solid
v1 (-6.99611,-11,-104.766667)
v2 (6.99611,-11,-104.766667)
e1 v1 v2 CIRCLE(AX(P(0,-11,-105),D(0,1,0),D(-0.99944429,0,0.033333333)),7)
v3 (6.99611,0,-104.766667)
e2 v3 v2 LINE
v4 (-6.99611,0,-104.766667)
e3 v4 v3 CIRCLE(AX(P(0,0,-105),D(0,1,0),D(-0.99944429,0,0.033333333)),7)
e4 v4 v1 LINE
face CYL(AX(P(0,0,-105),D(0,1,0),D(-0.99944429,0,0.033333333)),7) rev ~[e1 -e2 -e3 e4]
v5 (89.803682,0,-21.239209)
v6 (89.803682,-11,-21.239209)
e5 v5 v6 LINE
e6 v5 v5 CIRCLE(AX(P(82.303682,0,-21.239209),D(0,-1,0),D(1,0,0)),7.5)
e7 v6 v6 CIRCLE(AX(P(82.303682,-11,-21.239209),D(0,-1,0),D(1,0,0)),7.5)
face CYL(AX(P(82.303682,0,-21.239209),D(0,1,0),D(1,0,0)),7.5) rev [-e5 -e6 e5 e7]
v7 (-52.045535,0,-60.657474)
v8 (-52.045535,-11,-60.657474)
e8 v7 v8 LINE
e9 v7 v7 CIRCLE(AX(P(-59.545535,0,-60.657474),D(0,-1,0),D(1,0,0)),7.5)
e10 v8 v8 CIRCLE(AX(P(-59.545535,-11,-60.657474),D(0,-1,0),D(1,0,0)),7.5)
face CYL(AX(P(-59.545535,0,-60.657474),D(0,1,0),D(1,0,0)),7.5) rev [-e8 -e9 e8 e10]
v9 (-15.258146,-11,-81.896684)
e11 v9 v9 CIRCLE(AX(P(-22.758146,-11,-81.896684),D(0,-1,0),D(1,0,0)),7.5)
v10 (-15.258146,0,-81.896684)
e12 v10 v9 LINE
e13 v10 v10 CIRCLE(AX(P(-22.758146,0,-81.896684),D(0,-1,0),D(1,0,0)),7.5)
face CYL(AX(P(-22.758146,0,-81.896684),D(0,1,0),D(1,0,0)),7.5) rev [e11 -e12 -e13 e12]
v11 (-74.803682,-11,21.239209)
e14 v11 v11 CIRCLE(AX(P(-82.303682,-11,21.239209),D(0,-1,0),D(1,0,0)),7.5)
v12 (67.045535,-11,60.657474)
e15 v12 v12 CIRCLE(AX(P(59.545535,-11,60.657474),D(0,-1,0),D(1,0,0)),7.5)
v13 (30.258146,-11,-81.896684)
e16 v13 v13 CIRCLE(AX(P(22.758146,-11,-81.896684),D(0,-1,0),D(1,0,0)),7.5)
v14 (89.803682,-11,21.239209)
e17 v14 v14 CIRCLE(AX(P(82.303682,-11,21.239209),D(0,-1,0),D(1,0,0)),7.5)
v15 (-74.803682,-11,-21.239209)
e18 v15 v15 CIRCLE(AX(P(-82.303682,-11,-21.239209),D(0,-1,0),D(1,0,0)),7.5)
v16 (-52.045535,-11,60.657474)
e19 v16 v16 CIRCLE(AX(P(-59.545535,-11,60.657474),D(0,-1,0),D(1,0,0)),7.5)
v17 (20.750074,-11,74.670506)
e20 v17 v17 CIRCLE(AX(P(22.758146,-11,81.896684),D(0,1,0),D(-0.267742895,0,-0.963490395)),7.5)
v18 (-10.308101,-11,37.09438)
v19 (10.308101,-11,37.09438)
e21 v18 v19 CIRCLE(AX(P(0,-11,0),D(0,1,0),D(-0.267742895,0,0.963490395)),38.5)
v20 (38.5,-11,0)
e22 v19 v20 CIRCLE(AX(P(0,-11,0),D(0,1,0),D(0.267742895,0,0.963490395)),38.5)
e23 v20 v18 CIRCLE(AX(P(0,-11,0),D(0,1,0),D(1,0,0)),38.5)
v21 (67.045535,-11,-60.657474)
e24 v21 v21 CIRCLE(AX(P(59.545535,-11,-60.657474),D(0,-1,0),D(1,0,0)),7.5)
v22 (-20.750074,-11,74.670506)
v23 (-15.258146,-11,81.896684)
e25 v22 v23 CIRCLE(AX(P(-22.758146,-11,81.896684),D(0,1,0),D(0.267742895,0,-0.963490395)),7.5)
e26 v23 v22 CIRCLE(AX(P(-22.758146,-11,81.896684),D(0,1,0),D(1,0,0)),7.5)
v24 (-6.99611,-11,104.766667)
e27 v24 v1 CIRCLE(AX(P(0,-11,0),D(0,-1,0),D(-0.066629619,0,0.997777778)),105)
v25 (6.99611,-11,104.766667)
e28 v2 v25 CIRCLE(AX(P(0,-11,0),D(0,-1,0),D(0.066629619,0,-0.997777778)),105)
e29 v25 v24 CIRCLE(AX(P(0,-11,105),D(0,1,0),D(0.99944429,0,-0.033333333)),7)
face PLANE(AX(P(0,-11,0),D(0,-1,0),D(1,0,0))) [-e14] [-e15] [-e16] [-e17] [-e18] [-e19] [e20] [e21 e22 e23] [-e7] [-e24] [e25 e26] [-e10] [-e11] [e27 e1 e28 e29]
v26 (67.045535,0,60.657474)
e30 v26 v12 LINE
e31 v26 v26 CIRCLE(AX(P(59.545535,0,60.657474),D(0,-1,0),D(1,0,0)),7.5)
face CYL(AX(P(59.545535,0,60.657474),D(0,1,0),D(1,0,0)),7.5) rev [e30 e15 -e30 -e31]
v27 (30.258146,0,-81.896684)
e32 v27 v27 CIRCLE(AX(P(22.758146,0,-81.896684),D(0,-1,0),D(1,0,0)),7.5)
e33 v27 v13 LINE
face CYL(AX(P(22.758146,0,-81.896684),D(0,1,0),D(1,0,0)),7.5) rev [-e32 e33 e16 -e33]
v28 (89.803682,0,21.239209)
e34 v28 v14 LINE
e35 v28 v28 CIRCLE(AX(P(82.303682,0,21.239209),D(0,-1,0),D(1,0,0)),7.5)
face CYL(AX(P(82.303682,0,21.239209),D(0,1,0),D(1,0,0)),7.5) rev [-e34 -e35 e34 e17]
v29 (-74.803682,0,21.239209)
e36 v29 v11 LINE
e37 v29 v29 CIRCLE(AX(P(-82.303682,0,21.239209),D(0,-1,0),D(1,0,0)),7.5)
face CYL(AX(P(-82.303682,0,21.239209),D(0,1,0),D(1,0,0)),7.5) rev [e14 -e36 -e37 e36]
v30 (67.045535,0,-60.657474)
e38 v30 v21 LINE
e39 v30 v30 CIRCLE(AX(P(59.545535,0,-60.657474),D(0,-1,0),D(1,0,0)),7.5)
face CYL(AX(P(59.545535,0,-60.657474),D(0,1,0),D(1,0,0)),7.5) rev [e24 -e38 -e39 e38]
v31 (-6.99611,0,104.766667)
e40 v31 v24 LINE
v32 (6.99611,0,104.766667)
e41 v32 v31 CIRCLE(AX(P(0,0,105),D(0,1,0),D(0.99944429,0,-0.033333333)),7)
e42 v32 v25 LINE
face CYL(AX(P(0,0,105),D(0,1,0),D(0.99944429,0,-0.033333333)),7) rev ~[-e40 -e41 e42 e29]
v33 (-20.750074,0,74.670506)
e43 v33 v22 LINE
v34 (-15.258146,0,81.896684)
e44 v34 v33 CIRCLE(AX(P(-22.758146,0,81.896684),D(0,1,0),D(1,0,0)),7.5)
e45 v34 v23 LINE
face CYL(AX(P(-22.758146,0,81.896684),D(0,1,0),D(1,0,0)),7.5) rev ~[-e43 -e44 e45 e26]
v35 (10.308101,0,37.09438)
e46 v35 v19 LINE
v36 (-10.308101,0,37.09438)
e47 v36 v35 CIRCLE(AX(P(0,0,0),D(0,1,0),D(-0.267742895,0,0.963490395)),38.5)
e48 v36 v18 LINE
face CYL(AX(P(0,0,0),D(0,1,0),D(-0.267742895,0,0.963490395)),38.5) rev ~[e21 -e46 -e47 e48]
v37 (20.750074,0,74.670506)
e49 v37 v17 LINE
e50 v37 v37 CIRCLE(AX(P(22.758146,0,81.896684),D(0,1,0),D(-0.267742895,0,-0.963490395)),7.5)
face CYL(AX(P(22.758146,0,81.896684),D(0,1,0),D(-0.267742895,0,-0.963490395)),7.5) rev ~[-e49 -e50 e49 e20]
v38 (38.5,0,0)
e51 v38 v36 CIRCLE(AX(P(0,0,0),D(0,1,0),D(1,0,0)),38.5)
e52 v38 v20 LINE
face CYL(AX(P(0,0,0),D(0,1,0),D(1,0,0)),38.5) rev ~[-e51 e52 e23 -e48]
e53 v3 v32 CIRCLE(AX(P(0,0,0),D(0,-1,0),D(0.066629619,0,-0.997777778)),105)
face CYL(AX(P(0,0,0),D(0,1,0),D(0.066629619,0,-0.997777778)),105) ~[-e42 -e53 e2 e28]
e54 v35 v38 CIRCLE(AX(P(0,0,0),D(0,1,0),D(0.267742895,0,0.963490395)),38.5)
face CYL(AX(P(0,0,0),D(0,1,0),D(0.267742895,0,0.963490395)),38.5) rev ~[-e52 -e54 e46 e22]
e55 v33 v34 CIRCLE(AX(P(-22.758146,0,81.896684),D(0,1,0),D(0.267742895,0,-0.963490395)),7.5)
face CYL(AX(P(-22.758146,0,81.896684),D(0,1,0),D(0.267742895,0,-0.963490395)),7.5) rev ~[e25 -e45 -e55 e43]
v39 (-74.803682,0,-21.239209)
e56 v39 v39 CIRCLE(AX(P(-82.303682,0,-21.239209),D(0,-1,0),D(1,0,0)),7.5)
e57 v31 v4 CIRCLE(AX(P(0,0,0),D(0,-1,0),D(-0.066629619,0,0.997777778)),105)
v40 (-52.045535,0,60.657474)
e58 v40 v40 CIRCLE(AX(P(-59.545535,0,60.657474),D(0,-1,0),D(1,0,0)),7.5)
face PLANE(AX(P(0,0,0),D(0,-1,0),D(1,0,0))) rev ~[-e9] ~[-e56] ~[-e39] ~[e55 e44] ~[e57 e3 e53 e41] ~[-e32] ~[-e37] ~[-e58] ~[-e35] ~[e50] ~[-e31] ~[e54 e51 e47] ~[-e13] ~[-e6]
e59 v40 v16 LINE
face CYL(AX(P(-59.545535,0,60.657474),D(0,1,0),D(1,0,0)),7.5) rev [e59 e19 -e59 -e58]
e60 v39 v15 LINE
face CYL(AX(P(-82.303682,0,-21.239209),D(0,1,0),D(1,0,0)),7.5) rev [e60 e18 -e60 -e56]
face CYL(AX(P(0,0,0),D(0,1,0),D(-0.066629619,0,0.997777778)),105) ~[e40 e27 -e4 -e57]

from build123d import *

# Parameters (mm, degrees)
F0_R     = 7.5
F1_DEPTH = 11


# Not quite as in the source:
# - a feature of the source that left no trace in its solid (it failed there, or was rolled back) is left out


with BuildPart() as f1:
    # F0 (on Front) → F1 (new body)
    with BuildSketch(Plane.XZ):
        with BuildLine():
            ThreePointArc((6.9961100303, 104.7666666667), (0, 98), (-6.9961100303, 104.7666666667))
            ThreePointArc((-6.9961100303, 104.7666666667), (-105, 0), (-6.9961100303, -104.7666666667))
            ThreePointArc((-6.9961100303, -104.7666666667), (0, -98), (6.9961100303, -104.7666666667))
            ThreePointArc((6.9961100303, -104.7666666667), (105, 0), (6.9961100303, 104.7666666667))
        make_face()
        with Locations((-59.54553545, -60.6574744609)):
            Circle(F0_R, mode=Mode.SUBTRACT)
        with Locations((-22.7581460876, -81.8966836121)):
            Circle(F0_R, mode=Mode.SUBTRACT)
        with Locations((-82.3036815375, -21.2392091511)):
            Circle(F0_R, mode=Mode.SUBTRACT)
        with Locations((22.7581460876, -81.8966836121)):
            Circle(F0_R, mode=Mode.SUBTRACT)
        with Locations((59.54553545, -60.6574744609)):
            Circle(F0_R, mode=Mode.SUBTRACT)
        with Locations((82.3036815375, -21.2392091511)):
            Circle(F0_R, mode=Mode.SUBTRACT)
        with Locations((-82.3036815375, 21.2392091511)):
            Circle(F0_R, mode=Mode.SUBTRACT)
        with Locations((-59.54553545, 60.6574744609)):
            Circle(F0_R, mode=Mode.SUBTRACT)
        with BuildLine():
            ThreePointArc((-15.2581460876, 81.8966836121), (-16.7869427812, 77.3585418036), (-20.750074374, 74.6705056463))
            ThreePointArc((-20.750074374, 74.6705056463), (-28.729349394, 86.4348254206), (-15.2581460876, 81.8966836121))
        make_face(mode=Mode.SUBTRACT)
        with BuildLine():
            ThreePointArc((10.3081014632, 37.0943802243), (30.6521769727, 23.2957946169), (38.5, 0))
            ThreePointArc((38.5, 0), (-23.2957946169, -30.6521769727), (-10.3081014632, 37.0943802243))
            ThreePointArc((-10.3081014632, 37.0943802243), (0, 38.5), (10.3081014632, 37.0943802243))
        make_face(mode=Mode.SUBTRACT)
        with Locations((82.3036815375, 21.2392091511)):
            Circle(F0_R, mode=Mode.SUBTRACT)
        with BuildLine():
            ThreePointArc((30.2581460876, 81.8966836121), (27.2962878961, 75.9254803057), (20.750074374, 74.6705056463))
            ThreePointArc((20.750074374, 74.6705056463), (18.2200042791, 87.8678869184), (30.2581460876, 81.8966836121))
        make_face(mode=Mode.SUBTRACT)
        with Locations((59.54553545, 60.6574744609)):
            Circle(F0_R, mode=Mode.SUBTRACT)
    extrude(amount=F1_DEPTH)


solid = f1.part
